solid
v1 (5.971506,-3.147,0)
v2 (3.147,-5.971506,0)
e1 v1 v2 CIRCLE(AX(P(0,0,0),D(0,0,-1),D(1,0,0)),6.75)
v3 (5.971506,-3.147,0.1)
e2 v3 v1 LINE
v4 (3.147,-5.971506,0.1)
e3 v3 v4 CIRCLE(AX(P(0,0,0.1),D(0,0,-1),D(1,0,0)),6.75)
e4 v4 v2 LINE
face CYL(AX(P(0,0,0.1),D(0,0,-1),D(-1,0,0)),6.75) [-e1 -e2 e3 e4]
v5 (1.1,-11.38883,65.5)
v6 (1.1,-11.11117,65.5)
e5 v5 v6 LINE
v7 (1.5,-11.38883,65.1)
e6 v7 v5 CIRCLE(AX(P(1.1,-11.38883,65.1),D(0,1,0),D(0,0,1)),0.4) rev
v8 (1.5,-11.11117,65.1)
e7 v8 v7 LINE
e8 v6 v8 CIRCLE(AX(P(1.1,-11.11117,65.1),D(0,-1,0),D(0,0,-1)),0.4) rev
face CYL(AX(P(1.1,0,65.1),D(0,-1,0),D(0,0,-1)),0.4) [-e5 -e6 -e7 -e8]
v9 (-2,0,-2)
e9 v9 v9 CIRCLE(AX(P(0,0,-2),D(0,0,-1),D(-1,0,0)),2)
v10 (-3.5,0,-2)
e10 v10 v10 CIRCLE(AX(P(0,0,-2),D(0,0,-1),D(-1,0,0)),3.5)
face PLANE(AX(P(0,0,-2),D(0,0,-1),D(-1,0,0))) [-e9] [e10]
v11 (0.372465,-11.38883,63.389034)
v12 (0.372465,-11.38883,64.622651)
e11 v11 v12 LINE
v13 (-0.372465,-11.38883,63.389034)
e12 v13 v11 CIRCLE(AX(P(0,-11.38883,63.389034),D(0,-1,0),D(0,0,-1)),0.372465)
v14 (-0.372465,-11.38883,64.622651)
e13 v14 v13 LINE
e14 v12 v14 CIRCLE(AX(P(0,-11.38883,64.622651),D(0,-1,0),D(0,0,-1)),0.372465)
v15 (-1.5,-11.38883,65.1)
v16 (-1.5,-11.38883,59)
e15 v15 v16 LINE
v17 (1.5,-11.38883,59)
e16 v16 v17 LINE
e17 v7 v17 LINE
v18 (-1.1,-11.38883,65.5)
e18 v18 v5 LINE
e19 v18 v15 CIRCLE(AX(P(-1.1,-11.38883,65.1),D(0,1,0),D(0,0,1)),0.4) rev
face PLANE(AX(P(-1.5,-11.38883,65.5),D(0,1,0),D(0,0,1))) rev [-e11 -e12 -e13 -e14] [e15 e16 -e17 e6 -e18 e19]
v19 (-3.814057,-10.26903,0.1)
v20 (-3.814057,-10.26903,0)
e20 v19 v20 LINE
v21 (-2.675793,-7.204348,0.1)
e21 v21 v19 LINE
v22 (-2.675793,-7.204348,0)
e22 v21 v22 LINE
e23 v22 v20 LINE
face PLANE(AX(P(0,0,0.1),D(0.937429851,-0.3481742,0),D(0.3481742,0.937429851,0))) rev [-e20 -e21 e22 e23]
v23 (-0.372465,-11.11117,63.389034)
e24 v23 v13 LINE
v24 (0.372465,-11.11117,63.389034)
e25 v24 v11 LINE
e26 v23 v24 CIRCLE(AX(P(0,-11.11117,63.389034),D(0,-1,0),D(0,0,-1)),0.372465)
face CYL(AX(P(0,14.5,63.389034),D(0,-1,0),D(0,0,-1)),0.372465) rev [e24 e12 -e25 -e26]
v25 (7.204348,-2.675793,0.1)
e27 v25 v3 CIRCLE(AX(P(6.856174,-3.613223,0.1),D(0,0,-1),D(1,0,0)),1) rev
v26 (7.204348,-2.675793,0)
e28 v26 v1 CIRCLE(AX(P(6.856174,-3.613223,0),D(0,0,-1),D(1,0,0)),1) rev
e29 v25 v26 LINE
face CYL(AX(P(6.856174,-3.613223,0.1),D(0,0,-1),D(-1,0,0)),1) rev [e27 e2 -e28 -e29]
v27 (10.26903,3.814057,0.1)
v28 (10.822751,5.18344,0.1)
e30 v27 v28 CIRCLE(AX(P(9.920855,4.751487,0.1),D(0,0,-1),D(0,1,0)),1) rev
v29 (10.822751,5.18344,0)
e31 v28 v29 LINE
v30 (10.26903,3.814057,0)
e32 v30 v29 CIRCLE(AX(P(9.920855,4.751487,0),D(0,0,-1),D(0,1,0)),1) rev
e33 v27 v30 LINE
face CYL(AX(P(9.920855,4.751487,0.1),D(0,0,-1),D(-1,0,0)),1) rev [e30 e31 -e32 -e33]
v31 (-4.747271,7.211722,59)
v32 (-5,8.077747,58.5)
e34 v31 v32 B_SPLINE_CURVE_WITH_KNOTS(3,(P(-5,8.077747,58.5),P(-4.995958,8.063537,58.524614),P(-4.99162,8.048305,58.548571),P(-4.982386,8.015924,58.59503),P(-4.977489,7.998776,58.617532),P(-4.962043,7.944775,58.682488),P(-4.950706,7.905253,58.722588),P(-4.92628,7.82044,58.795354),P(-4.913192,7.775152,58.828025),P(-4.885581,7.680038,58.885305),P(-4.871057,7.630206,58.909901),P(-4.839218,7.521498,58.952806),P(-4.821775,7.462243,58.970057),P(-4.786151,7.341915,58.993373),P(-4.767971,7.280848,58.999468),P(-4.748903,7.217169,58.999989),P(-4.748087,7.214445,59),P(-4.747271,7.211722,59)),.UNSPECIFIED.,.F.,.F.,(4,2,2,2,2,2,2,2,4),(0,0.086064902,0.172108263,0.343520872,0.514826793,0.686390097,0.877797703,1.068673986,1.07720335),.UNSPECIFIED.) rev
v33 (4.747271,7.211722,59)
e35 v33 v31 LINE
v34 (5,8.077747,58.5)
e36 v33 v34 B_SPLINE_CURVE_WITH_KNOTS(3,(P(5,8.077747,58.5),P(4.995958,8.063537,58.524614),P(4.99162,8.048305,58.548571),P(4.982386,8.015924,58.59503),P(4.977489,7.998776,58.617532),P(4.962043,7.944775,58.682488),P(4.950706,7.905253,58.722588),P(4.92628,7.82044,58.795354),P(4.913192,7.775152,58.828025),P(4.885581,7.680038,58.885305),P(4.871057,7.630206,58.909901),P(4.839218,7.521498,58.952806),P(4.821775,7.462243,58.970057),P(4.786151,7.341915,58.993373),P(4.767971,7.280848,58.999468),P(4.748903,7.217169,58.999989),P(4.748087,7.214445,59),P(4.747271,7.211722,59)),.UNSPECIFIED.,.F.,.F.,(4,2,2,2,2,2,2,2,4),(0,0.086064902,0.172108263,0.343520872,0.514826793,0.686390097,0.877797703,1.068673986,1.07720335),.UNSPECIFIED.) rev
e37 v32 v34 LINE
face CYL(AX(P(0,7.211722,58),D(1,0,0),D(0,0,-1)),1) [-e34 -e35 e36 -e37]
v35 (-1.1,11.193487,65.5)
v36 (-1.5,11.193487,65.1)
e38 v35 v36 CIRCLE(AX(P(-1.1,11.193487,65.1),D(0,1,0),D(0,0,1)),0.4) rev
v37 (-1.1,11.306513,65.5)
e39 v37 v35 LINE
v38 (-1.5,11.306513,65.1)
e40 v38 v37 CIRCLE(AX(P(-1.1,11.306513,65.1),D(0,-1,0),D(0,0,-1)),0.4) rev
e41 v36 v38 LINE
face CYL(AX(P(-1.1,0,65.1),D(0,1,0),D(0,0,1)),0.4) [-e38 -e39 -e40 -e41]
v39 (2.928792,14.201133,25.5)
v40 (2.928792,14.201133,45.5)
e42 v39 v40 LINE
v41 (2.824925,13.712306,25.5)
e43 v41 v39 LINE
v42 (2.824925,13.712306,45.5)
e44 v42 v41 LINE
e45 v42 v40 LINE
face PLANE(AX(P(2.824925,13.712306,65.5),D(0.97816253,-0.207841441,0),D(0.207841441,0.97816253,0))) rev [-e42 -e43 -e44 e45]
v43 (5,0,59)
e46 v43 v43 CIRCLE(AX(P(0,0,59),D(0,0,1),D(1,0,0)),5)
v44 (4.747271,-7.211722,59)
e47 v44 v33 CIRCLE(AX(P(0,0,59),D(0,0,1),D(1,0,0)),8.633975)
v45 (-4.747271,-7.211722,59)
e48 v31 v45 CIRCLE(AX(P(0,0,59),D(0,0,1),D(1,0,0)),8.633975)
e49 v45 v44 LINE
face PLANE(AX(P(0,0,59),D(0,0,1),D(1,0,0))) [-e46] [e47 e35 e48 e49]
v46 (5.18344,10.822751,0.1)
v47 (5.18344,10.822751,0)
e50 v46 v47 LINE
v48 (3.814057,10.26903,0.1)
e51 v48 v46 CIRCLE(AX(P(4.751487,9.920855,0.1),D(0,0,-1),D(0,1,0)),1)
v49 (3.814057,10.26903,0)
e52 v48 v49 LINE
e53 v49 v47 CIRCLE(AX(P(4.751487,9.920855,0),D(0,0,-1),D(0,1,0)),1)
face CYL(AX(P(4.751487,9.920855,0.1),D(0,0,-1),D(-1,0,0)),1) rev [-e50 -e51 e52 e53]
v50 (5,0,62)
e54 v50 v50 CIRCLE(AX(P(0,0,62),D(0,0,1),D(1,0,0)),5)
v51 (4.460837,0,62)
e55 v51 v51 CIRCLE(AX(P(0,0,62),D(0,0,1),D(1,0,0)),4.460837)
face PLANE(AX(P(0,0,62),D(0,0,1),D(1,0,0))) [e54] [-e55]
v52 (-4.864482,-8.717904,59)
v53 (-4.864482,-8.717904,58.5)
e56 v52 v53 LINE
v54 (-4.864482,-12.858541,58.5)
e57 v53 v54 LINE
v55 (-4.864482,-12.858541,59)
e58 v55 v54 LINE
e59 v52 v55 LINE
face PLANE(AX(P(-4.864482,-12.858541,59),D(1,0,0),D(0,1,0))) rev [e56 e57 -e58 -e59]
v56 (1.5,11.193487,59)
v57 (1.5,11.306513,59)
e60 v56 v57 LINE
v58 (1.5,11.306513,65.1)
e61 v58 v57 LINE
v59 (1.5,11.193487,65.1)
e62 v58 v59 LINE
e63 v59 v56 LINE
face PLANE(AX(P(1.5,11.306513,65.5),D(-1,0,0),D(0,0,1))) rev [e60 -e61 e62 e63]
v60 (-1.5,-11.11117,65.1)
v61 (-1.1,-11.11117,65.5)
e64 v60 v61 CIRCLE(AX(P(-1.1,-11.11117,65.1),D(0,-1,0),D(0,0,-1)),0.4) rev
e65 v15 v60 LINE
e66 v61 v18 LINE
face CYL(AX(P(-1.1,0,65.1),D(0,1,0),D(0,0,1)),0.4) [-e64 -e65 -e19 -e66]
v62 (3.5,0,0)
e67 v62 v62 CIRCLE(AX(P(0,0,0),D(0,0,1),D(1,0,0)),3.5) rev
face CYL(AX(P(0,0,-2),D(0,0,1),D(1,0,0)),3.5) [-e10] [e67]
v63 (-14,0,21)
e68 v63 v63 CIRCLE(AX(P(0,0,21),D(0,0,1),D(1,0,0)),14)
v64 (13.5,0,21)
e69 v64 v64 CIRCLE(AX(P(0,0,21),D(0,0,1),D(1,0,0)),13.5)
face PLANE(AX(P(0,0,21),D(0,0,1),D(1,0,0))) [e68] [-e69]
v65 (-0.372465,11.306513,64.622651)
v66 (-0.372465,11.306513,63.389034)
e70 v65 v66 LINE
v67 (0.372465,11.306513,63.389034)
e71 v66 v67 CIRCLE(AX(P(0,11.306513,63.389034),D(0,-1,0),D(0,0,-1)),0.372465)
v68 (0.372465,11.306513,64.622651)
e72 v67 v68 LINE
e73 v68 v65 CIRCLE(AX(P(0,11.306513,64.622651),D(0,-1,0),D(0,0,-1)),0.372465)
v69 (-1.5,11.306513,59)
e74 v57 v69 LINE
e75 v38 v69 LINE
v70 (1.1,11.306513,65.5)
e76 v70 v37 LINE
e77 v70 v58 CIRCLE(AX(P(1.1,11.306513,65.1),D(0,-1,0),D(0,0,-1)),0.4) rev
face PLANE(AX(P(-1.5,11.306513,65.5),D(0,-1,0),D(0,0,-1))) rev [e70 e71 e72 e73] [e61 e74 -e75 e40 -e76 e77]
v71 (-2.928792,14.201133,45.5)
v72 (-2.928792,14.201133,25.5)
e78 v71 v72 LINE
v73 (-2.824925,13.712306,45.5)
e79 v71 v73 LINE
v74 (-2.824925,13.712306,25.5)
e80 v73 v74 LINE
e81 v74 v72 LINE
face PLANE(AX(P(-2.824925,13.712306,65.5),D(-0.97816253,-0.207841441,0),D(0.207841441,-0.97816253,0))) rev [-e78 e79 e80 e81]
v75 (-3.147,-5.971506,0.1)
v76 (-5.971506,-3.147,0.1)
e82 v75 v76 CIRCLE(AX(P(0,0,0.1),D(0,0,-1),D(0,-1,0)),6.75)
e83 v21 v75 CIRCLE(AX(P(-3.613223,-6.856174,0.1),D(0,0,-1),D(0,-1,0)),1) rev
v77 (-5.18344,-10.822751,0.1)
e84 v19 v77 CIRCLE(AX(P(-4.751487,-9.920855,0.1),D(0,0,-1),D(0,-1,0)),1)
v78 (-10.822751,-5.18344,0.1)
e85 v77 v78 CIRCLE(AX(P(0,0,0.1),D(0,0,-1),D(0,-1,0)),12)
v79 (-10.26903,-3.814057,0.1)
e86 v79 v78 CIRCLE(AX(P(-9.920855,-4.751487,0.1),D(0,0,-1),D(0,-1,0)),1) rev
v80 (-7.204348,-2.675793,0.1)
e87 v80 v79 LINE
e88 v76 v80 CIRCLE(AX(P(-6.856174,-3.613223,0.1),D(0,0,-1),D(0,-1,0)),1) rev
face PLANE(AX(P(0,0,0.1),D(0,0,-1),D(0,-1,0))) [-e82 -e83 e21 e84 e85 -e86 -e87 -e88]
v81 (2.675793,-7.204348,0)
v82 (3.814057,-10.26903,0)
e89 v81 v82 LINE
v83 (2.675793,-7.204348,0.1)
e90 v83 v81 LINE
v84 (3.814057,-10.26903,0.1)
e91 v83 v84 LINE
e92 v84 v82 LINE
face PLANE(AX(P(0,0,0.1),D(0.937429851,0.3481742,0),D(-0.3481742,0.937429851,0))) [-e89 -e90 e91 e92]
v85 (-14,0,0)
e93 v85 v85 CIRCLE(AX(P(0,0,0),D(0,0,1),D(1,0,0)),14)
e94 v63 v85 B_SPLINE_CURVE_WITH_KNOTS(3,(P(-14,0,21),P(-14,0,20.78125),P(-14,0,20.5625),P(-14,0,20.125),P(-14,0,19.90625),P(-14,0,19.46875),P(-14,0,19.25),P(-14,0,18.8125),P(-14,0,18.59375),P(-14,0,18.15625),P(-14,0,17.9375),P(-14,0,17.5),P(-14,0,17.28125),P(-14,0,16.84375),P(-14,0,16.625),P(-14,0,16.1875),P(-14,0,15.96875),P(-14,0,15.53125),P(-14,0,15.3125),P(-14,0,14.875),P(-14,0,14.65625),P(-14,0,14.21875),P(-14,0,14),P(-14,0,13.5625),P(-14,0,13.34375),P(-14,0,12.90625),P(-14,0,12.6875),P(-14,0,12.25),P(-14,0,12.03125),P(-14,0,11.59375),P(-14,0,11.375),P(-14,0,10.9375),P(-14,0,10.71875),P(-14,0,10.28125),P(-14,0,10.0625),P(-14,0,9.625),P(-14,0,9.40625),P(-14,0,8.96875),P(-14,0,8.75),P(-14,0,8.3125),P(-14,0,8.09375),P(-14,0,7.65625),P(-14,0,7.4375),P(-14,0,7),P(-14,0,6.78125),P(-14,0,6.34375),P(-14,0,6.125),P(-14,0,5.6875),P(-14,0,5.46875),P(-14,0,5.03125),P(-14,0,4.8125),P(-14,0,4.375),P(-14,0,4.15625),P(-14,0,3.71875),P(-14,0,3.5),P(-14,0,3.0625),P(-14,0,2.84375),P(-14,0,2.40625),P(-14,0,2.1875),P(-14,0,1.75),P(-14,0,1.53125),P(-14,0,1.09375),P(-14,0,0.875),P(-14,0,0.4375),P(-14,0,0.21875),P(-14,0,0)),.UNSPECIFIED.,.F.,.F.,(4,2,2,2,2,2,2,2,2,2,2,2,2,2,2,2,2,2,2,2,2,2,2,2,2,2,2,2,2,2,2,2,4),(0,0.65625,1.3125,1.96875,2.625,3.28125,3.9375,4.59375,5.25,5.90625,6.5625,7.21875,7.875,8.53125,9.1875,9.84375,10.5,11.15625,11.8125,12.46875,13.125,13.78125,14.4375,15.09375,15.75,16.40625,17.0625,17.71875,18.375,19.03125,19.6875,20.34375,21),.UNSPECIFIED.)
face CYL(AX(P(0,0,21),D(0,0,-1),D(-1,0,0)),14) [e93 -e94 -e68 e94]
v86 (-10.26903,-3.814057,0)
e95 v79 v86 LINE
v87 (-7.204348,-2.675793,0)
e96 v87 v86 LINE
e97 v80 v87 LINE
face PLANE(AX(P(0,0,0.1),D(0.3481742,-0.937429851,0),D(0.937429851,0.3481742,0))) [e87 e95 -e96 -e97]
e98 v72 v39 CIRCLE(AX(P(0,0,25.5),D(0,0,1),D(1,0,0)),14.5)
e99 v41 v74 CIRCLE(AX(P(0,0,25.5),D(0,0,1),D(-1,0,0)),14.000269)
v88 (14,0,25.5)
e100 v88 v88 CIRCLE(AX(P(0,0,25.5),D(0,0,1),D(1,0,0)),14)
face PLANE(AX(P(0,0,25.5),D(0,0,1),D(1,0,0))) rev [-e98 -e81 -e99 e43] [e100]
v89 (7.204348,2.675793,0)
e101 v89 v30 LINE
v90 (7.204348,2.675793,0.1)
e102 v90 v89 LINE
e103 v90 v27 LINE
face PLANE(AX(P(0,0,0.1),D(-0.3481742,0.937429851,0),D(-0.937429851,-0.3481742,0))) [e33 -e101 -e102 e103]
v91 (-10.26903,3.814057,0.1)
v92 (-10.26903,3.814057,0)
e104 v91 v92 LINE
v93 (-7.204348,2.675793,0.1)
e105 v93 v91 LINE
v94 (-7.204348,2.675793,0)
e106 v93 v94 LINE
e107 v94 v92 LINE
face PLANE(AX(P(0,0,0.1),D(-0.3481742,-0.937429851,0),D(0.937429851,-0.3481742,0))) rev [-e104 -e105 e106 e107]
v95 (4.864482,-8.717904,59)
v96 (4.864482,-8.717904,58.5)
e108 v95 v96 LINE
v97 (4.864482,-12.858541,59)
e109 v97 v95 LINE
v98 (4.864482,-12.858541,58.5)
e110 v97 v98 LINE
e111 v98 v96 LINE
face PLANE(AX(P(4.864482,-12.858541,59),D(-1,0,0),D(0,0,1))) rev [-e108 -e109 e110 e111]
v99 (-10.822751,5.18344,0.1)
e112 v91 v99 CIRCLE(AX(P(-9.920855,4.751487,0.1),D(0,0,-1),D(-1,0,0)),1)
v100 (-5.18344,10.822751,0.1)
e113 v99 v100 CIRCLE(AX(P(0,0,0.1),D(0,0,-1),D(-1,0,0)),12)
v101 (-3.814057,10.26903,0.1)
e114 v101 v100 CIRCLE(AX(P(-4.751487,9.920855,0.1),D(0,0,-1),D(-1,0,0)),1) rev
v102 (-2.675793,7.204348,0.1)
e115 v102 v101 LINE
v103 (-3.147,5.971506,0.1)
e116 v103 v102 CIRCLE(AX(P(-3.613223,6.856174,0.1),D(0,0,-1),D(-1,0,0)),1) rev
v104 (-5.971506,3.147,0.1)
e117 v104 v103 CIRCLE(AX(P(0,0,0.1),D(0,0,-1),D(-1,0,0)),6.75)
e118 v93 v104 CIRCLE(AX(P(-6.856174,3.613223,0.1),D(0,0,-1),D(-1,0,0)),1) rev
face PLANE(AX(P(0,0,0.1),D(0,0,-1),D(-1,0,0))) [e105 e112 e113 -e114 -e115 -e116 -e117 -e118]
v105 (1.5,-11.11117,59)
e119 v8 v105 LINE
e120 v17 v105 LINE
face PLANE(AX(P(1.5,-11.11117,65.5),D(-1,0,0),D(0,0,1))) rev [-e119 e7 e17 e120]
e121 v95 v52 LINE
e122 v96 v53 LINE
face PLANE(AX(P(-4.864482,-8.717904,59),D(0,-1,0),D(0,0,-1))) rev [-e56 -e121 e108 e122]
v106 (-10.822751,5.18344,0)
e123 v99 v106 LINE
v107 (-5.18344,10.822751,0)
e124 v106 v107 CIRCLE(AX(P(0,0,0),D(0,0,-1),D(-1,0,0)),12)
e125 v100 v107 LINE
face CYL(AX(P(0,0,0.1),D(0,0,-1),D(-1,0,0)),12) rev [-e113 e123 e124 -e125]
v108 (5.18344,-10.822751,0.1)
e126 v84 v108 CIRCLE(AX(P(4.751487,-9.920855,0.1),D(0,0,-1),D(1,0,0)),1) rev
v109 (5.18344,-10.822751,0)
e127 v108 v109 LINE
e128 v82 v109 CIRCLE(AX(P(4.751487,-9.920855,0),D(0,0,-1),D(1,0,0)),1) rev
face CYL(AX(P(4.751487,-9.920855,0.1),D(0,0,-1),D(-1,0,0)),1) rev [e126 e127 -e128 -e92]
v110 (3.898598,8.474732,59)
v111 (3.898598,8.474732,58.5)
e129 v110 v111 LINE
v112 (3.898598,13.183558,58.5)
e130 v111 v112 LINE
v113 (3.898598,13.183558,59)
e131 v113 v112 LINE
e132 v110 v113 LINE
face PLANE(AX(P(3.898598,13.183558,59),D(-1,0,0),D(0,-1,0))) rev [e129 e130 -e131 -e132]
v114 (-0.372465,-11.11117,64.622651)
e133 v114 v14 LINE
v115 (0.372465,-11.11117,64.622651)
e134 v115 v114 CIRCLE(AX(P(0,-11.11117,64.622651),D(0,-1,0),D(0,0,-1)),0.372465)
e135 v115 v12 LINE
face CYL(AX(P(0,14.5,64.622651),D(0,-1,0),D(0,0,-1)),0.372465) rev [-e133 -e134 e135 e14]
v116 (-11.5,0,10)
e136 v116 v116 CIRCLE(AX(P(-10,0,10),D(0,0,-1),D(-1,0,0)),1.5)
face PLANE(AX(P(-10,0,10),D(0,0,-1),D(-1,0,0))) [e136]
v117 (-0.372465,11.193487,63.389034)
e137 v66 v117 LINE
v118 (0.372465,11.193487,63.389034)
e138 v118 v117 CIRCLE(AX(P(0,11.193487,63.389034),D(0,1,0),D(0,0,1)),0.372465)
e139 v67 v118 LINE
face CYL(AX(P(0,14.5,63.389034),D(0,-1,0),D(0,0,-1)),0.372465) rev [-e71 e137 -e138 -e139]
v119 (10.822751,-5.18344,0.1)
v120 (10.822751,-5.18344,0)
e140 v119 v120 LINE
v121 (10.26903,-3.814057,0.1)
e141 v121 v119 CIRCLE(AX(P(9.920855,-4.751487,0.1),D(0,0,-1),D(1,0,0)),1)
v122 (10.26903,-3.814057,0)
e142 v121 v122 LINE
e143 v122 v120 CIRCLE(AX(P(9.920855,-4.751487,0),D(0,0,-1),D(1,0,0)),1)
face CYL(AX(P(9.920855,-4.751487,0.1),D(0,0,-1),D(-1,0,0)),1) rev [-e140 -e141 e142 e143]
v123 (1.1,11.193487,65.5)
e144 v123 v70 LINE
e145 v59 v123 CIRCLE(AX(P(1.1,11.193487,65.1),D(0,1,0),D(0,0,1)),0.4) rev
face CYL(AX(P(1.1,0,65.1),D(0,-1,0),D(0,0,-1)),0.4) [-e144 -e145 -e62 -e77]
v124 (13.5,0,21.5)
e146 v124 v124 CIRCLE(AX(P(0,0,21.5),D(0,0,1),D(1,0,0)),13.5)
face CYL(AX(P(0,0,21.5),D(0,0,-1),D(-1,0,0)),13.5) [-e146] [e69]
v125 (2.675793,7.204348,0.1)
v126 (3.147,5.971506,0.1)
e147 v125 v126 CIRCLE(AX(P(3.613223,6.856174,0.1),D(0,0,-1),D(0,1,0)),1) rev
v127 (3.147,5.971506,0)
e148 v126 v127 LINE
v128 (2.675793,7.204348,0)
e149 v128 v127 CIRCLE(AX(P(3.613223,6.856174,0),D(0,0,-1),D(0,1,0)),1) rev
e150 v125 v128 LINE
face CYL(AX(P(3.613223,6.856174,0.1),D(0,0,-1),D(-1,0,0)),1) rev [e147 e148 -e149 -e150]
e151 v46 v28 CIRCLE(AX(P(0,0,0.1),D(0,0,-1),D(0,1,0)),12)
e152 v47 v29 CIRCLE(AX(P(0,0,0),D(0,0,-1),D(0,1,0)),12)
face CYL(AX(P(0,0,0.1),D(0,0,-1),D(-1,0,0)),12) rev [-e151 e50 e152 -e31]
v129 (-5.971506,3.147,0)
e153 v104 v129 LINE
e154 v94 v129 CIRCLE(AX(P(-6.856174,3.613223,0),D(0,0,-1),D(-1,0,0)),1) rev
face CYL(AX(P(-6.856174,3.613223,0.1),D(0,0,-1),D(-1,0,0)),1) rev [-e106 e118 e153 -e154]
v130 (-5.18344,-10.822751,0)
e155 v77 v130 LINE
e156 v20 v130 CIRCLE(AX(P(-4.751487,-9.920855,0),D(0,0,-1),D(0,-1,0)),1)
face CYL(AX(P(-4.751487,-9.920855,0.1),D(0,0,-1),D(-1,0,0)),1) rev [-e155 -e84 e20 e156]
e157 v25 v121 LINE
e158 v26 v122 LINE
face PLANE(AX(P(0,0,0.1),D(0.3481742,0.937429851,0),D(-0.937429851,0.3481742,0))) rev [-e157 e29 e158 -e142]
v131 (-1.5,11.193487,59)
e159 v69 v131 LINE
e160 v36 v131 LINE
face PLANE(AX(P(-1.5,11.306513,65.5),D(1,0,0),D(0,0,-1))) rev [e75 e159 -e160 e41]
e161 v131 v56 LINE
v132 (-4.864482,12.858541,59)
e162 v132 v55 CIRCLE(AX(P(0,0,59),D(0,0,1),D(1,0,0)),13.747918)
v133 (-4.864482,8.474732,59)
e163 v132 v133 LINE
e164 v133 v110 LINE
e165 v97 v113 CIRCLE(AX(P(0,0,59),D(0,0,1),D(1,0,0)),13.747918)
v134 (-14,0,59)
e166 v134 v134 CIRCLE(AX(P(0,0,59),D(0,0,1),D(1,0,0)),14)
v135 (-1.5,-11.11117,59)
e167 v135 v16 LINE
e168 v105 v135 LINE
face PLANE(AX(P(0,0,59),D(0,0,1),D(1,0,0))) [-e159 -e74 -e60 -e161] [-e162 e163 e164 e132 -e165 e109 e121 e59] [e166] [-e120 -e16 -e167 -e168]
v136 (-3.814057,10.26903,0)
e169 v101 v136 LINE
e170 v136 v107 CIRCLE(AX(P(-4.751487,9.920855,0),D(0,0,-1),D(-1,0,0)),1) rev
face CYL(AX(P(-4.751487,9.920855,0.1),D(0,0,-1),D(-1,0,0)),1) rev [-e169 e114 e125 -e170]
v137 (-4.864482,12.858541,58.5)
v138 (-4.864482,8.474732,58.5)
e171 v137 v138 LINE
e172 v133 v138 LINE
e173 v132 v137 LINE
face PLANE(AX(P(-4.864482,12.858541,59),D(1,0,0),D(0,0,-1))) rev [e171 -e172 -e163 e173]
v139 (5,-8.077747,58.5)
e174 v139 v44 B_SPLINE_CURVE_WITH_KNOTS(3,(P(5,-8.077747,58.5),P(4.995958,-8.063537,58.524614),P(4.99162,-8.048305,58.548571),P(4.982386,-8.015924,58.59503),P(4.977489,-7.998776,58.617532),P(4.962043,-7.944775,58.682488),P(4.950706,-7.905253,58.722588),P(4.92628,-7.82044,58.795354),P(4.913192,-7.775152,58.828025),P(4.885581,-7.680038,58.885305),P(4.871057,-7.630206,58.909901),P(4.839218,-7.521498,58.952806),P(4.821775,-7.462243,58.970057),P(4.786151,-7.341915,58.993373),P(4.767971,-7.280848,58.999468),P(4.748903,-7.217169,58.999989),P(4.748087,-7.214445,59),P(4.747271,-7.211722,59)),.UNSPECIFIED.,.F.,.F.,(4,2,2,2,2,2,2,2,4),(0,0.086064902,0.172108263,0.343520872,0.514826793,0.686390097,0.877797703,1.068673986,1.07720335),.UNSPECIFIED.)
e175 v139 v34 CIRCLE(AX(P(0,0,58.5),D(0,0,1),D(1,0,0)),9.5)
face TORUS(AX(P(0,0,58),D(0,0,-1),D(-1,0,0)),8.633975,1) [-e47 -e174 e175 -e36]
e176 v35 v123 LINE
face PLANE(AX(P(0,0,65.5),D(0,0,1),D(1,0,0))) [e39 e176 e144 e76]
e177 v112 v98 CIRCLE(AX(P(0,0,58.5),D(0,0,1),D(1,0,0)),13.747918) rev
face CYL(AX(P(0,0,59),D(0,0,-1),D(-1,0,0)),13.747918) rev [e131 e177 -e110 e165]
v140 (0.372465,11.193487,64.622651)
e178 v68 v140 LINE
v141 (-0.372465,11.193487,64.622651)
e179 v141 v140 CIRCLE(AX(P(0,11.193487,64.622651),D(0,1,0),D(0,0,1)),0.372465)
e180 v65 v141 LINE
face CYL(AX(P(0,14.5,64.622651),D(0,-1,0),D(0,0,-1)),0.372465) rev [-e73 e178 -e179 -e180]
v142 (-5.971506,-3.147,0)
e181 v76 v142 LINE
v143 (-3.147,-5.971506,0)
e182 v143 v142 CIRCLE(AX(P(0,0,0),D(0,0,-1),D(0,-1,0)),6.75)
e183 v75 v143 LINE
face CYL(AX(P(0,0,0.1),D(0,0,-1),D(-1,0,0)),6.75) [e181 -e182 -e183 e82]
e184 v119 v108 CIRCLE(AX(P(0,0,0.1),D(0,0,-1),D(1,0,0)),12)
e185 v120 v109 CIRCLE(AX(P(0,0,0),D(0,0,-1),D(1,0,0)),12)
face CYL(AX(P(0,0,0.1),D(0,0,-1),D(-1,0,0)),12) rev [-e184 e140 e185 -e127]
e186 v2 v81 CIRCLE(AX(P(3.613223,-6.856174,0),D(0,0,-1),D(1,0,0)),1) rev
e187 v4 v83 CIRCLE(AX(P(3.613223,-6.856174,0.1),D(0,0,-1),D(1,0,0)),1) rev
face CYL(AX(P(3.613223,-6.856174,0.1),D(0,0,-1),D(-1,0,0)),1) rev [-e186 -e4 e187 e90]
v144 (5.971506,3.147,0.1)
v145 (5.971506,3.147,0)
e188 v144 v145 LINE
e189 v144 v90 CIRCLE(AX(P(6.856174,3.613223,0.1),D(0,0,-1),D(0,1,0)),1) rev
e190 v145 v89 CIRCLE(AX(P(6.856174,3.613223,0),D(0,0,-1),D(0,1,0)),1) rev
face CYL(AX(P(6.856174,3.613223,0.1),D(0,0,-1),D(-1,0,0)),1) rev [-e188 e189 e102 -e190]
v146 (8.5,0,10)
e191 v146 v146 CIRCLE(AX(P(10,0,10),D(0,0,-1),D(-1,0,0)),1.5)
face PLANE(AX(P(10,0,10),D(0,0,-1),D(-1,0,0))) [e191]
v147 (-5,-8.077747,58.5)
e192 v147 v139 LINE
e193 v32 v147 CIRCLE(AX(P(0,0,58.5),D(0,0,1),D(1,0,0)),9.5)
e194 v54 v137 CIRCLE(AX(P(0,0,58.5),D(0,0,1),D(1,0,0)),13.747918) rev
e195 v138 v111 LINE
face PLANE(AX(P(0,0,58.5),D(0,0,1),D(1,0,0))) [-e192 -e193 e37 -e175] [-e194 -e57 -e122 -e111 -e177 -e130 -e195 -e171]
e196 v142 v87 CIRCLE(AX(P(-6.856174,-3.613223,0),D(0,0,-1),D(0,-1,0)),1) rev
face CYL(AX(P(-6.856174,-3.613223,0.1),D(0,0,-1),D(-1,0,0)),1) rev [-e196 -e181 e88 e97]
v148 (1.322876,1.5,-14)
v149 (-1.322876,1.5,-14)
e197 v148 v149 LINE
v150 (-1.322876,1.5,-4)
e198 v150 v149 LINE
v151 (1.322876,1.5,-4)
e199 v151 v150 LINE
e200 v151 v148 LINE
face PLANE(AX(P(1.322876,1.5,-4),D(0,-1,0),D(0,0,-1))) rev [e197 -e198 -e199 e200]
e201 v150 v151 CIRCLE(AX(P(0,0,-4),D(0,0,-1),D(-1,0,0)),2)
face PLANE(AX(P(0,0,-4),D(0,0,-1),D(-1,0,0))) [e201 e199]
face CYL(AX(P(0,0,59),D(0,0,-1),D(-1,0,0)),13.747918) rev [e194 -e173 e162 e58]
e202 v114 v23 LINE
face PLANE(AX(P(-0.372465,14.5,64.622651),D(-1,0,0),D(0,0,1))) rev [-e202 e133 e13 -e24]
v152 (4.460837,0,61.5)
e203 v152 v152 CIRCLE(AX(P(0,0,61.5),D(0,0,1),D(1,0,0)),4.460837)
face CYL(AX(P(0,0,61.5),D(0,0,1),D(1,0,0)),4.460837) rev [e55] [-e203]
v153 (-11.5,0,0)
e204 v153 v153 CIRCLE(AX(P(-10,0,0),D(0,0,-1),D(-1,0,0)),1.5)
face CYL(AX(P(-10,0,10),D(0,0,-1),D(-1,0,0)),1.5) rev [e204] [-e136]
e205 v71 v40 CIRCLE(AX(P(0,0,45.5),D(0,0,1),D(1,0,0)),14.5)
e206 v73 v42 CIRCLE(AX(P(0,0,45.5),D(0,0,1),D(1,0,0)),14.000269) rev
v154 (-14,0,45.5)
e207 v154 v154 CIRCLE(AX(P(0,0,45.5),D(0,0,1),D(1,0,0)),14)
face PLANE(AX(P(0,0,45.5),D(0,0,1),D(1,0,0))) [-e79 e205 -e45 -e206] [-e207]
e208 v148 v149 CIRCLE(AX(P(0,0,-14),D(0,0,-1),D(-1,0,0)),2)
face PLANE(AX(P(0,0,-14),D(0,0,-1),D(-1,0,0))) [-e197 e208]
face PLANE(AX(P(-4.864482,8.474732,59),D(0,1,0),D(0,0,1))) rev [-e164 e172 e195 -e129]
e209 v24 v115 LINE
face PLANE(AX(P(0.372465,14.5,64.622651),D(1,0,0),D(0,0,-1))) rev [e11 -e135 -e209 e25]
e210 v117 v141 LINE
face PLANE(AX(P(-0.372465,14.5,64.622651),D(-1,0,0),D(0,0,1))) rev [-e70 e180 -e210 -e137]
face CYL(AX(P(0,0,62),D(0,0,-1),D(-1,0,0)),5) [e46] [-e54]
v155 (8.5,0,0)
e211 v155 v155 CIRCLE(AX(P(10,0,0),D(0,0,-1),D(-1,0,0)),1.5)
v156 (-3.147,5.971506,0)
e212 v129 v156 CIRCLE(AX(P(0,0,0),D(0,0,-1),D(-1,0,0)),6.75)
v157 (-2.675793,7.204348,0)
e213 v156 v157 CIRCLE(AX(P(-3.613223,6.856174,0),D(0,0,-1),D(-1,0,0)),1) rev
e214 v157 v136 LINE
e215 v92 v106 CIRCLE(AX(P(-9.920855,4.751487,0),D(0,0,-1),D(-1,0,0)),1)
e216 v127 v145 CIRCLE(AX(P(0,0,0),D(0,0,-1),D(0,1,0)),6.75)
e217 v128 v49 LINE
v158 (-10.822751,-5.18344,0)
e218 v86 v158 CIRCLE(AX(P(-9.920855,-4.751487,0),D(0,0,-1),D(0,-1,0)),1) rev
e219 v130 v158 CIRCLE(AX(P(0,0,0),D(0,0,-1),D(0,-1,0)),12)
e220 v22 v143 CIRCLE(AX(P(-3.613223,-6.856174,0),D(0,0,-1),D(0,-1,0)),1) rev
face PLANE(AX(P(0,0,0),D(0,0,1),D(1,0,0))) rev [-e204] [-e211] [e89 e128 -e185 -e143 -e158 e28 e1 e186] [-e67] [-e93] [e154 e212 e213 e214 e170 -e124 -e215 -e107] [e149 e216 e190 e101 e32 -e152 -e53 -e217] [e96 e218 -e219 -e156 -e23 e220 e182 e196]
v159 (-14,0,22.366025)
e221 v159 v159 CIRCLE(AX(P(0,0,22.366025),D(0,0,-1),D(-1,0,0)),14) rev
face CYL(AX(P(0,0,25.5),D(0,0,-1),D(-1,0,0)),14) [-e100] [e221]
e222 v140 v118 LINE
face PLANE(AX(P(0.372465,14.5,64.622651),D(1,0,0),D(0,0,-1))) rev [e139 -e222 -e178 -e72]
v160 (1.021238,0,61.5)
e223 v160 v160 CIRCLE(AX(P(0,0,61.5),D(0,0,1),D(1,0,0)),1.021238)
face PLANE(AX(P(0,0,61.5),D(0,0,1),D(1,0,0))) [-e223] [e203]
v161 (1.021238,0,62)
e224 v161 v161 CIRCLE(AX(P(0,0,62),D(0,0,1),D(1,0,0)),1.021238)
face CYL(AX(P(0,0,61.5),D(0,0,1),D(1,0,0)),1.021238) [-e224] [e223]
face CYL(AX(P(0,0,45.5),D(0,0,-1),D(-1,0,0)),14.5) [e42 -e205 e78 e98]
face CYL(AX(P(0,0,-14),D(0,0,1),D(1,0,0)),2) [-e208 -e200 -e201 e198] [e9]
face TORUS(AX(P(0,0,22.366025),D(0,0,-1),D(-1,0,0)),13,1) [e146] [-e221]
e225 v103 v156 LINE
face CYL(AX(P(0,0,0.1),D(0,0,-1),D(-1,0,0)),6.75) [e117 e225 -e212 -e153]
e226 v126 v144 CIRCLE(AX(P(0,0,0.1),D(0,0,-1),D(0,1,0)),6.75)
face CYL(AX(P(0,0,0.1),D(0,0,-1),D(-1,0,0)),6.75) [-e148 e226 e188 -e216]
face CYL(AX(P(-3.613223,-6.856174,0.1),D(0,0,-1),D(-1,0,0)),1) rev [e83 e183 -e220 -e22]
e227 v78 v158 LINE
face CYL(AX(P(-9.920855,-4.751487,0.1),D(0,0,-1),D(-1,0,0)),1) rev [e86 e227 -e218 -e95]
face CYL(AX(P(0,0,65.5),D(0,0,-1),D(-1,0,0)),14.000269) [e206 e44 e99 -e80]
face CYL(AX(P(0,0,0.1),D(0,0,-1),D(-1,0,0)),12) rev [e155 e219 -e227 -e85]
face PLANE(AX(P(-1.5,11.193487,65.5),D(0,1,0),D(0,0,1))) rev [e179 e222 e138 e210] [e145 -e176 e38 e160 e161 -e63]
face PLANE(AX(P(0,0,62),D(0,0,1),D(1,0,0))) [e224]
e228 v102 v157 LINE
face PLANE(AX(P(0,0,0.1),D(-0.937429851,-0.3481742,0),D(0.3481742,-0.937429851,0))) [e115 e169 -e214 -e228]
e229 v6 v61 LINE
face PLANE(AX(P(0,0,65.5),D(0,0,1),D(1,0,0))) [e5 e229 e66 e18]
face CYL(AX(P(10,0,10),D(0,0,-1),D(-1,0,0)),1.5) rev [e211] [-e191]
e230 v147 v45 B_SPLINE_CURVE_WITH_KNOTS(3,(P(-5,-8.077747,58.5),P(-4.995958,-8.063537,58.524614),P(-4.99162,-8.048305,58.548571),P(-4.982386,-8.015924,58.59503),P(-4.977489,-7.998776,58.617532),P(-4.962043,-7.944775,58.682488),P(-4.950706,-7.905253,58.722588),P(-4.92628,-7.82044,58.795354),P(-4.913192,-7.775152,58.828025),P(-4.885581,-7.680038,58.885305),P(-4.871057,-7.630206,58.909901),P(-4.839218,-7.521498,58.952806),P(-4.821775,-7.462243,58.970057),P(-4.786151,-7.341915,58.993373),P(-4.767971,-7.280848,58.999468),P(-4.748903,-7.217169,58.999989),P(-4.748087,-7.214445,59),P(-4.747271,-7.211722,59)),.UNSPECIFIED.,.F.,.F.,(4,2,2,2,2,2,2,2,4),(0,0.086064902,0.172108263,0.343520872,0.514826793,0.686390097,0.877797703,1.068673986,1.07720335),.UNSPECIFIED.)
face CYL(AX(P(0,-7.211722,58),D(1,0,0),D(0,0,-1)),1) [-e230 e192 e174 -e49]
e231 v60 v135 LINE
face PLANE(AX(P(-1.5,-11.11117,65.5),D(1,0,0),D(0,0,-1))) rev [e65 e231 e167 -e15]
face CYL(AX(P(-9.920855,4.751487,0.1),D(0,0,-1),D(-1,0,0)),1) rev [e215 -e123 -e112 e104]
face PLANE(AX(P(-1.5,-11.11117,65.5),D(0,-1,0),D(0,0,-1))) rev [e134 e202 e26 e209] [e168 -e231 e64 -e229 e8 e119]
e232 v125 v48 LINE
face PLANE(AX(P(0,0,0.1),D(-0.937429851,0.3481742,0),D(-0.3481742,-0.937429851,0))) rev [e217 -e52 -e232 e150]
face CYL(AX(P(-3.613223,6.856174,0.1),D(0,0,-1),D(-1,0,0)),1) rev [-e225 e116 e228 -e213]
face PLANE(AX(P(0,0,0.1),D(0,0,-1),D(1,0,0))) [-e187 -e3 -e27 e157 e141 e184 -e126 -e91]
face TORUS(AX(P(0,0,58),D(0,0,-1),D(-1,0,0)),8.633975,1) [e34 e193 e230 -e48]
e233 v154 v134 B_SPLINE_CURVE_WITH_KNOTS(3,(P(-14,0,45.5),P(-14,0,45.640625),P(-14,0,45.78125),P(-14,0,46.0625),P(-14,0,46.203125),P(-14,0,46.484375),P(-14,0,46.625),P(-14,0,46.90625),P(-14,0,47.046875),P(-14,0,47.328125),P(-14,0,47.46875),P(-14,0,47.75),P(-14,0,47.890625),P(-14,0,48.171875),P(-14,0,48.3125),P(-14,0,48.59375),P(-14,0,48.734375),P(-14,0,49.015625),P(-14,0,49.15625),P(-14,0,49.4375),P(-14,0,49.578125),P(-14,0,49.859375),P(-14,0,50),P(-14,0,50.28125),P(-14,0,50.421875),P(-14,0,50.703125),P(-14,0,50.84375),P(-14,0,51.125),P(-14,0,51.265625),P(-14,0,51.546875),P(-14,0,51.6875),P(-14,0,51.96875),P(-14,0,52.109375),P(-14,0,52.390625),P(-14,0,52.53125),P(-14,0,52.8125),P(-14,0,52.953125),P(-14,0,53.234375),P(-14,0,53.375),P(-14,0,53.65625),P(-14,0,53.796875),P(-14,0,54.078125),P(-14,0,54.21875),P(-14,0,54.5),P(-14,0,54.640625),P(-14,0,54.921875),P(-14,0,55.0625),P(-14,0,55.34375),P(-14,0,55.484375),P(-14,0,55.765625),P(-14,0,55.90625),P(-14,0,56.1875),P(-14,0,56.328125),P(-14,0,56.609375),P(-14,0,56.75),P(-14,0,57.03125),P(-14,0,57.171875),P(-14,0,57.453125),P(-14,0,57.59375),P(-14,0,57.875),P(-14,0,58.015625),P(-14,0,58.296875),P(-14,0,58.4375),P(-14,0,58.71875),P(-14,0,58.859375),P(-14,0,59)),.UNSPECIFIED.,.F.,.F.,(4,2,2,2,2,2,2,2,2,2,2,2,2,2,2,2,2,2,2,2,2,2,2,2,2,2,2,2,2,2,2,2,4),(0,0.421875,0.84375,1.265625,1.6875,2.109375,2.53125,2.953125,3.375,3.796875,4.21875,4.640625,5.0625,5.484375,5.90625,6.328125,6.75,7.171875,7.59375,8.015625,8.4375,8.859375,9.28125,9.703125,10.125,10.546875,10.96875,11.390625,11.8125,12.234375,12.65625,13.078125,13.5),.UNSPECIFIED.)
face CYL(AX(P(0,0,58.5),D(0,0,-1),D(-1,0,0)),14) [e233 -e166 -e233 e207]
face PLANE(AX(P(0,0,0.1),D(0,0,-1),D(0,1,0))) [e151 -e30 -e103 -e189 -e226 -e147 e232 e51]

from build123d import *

# Parameters (mm, degrees)
SKETCH1_R            = 14
BOSS_EXTRUDE1_DEPTH  = 21
SKETCH2_R            = 13.5
BOSS_EXTRUDE2_DEPTH  = 0.5
SKETCH3_R            = 14
BOSS_EXTRUDE3_DEPTH  = 4
SKETCH4_R            = 14.5
BOSS_EXTRUDE4_DEPTH  = 20
SKETCH5_R            = 14
BOSS_EXTRUDE5_DEPTH  = 13
FILLET1_R            = 1
SKETCH6_R            = 14
SKETCH6_R_2          = 13.74791831
BOSS_EXTRUDE6_DEPTH  = 0.5
FILLET2_R            = 1
SKETCH7_R            = 5
BOSS_EXTRUDE7_DEPTH  = 3
SKETCH8_R            = 4.460837006
SKETCH8_R_2          = 1.021238478
CUT_EXTRUDE1_DEPTH   = 0.5
BOSS_EXTRUDE8_DEPTH  = 0.5
SKETCH10_W           = 3
SKETCH10_H           = 0.113026654
SKETCH10_H_2         = 0.277660136
BOSS_EXTRUDE9_DEPTH  = 6.5
FILLET3_R            = 0.4
CUT_EXTRUDE2_DEPTH   = 72.907798758
CUT_EXTRUDE3_DEPTH   = 0.1
CIRPATTERN1_COUNT    = 4
CUT_EXTRUDE4_DEPTH   = 45.949972191
SKETCH15_R           = 3.5
BOSS_EXTRUDE10_DEPTH = 2
SKETCH16_R           = 2
BOSS_EXTRUDE11_DEPTH = 12
CUT_EXTRUDE7_START   = -10
CUT_EXTRUDE7_DEPTH   = 10
SKETCH18_R           = 1.5
CUT_EXTRUDE8_DEPTH   = 10


with BuildPart() as part:
    # Sketch1 → Boss-Extrude1 (new body)
    with BuildSketch(Plane.XY):
        with Locations(Location((0, 0, 0), (0, 0, 180))):
            Circle(SKETCH1_R)
    extrude(amount=BOSS_EXTRUDE1_DEPTH)

    # Sketch2 → Boss-Extrude2 (add)
    with BuildSketch(Plane.XY.offset(21)):
        Circle(SKETCH2_R)
    extrude(amount=BOSS_EXTRUDE2_DEPTH)

    # Sketch3 → Boss-Extrude3 (add)
    with BuildSketch(Plane.XY.offset(21.5)):
        with Locations(Location((0, 0, 0), (0, 0, 180))):
            Circle(SKETCH3_R)
    extrude(amount=BOSS_EXTRUDE3_DEPTH)

    # Sketch4 → Boss-Extrude4 (add)
    with BuildSketch(Plane.XY.offset(25.5)):
        Circle(SKETCH4_R)
    extrude(amount=BOSS_EXTRUDE4_DEPTH)

    # Sketch5 → Boss-Extrude5 (add)
    with BuildSketch(Plane.XY.offset(45.5)):
        with Locations(Location((0, 0, 0), (0, 0, 180))):
            Circle(SKETCH5_R)
    extrude(amount=BOSS_EXTRUDE5_DEPTH)

    # Fillet1
    # the kernel refuses this fillet: 1 mm, written as the material it takes off along each edge
    with BuildSketch(Plane(origin=(0, 0, 21.5), x_dir=(-1, 0, 0), z_dir=(0, 1, 0))) as fillet1_piece_1:
        with BuildLine():
            CenterArc((13, 0.866025404), FILLET1_R, 300, 60)
            Line((13.5, 0), (13.51, -0.017320508))
            ThreePointArc((13.51, -0.017320508), (13.75, -0.02), (14, -0.02))
            Line((14, -0.02), (14.02, 0))
            Line((14.02, 0), (14.02, 0.866025404))
            Line((14.02, 0.866025404), (14, 0.866025404))
        make_face()
    revolve(axis=Axis((0, 0, 21.5), (0, 0, 1)), mode=Mode.SUBTRACT)

    # Sketch6 → Boss-Extrude6 (add)
    # profile 1 of 2: a face of its own
    with BuildSketch(Plane.XY.offset(58.5)):
        with Locations(Location((0, 0, 0), (0, 0, 180))):
            Circle(SKETCH6_R)
        Circle(SKETCH6_R_2, mode=Mode.SUBTRACT)
    # profile 2 of 2: a face of its own
    with BuildSketch(Plane.XY.offset(58.5)):
        with BuildLine():
            Line((-5, -8.077747211), (5, -8.077747211))
            ThreePointArc((5, -8.077747211), (9.5, 0), (5, 8.077747211))
            Line((5, 8.077747211), (-5, 8.077747211))
            ThreePointArc((-5, 8.077747211), (-9.5, 0), (-5, -8.077747211))
        make_face()
    extrude(amount=BOSS_EXTRUDE6_DEPTH)

    # Fillet2
    # the kernel refuses this fillet: 1 mm, written as the material it takes off along each edge
    with BuildSketch(Plane(origin=(0, 0, 59), x_dir=(-0.3204523861035329, 0.9472646241893299, 0), z_dir=(0.9472646241893299, 0.3204523861035329, 0))) as fillet2_piece_1:
        with BuildLine():
            CenterArc((8.633974596, -1), FILLET2_R, 30, 60)
            Line((9.5, -0.5), (9.517320508, -0.49))
            ThreePointArc((9.517320508, -0.49), (9.52, -0.25), (9.52, 0))
            Line((9.52, 0), (9.5, 0.02))
            Line((9.5, 0.02), (8.633974596, 0.02))
            Line((8.633974596, 0.02), (8.633974596, 0))
        make_face()
    revolve(axis=Axis((0, 0, 59), (0, 0, 1)), revolution_arc=142.619429044, mode=Mode.SUBTRACT)
    with BuildSketch(Plane(origin=(7.165063509, 8.077747211, 59), x_dir=(0, -1, 0), z_dir=(-1, 0, 0)), Plane(origin=(-7.165063509, -8.077747211, 59), x_dir=(0, 1, 0), z_dir=(1, 0, 0))) as fillet2_piece_2:
        with BuildLine():
            CenterArc((0.866025404, -1), FILLET2_R, 90, 60)
            Line((0, -0.5), (-0.017320508, -0.49))
            ThreePointArc((-0.017320508, -0.49), (-0.02, -0.25), (-0.02, 0))
            Line((-0.02, 0), (0, 0.02))
            Line((0, 0.02), (0.866025404, 0.02))
            Line((0.866025404, 0.02), (0.866025404, 0))
        make_face()
    extrude(amount=14.330127019, mode=Mode.SUBTRACT)
    with BuildSketch(Plane(origin=(0, 0, 59), x_dir=(0.3204523861035327, -0.9472646241893299, 0), z_dir=(-0.9472646241893299, -0.3204523861035327, 0))) as fillet2_piece_3:
        with BuildLine():
            CenterArc((8.633974596, -1), FILLET2_R, 30, 60)
            Line((8.633974596, 0), (8.633974596, 0.02))
            Line((8.633974596, 0.02), (9.5, 0.02))
            Line((9.5, 0.02), (9.52, 0))
            ThreePointArc((9.52, 0), (9.52, -0.25), (9.517320508, -0.49))
            Line((9.517320508, -0.49), (9.5, -0.5))
        make_face()
    revolve(axis=Axis((0, 0, 59), (0, 0, 1)), revolution_arc=142.619429044, mode=Mode.SUBTRACT)

    # Sketch7 → Boss-Extrude7 (add)
    with BuildSketch(Plane.XY.offset(59)):
        Circle(SKETCH7_R)
    extrude(amount=BOSS_EXTRUDE7_DEPTH)

    # Sketch8 → Cut-Extrude1 (cut)
    with BuildSketch(Plane.XY.offset(62)):
        Circle(SKETCH8_R)
        Circle(SKETCH8_R_2, mode=Mode.SUBTRACT)
    extrude(amount=-CUT_EXTRUDE1_DEPTH, mode=Mode.SUBTRACT)

    # Sketch9 → Boss-Extrude8 (add)
    with BuildSketch(Plane.XY.offset(58.5)):
        with BuildLine():
            Line((-4.864481732, 12.858540949), (-4.864481732, 8.474731605))
            Line((-4.864481732, 8.474731605), (3.898597634, 8.474731605))
            Line((3.898597634, 8.474731605), (3.898597634, 13.183557727))
            ThreePointArc((3.898597634, 13.183557727), (-0.509550782, 13.738472108), (-4.864481732, 12.858540949))
        make_face()
        with BuildLine():
            Line((-4.864481732, -12.858540949), (-4.864481732, -8.717904414))
            Line((-4.864481732, -8.717904414), (4.864481732, -8.717904414))
            Line((4.864481732, -8.717904414), (4.864481732, -12.858540949))
            ThreePointArc((4.864481732, -12.858540949), (0, -13.74791831), (-4.864481732, -12.858540949))
        make_face()
    extrude(amount=BOSS_EXTRUDE8_DEPTH)

    # Sketch10 → Boss-Extrude9 (add)
    with BuildSketch(Plane.XY.offset(59)):
        with Locations((0, 11.25)):
            Rectangle(SKETCH10_W, SKETCH10_H)
        with Locations((0, -11.25)):
            Rectangle(SKETCH10_W, SKETCH10_H_2)
    extrude(amount=BOSS_EXTRUDE9_DEPTH)

    # Fillet3
    fillet3_edges = [part.edges().sort_by_distance(p)[0] for p in [
        (1.5, 11.25, 65.5),
        (-1.5, 11.25, 65.5),
        (1.5, -11.25, 65.5),
        (-1.5, -11.25, 65.5),
    ]]
    fillet(fillet3_edges, radius=FILLET3_R)

    # Sketch11 → Cut-Extrude2 (cut, through all)
    with BuildSketch(Plane.XZ.offset(11.388830068)):
        with BuildLine():
            Line((0.372464769, 64.6226508), (0.372464769, 63.389034489))
            ThreePointArc((0.372464769, 63.389034489), (0, 63.016569721), (-0.372464769, 63.389034489))
            Line((-0.372464769, 63.389034489), (-0.372464769, 64.6226508))
            ThreePointArc((-0.372464769, 64.6226508), (0, 64.995115568), (0.372464769, 64.6226508))
        make_face()
    extrude(amount=-CUT_EXTRUDE2_DEPTH, mode=Mode.SUBTRACT)

    # Sketch12 → Cut-Extrude3 (cut)
    with BuildSketch(Plane(origin=(0, 0, 0), x_dir=(-1, 0, 0), z_dir=(0, 0, -1))):
        with BuildLine():
            Line((2.675792917, 7.20434815), (3.81405727, 10.269029513))
            ThreePointArc((3.81405727, 10.269029513), (4.376615733, 10.847932139), (5.183440496, 10.82275125))
            ThreePointArc((5.183440496, 10.82275125), (8.485281374, 8.485281374), (10.82275125, 5.183440496))
            ThreePointArc((10.82275125, 5.183440496), (10.847932139, 4.376615733), (10.269029513, 3.81405727))
            Line((10.269029513, 3.81405727), (7.20434815, 2.675792917))
            ThreePointArc((7.20434815, 2.675792917), (6.499150933, 2.679127181), (5.971506343, 3.147000475))
            ThreePointArc((5.971506343, 3.147000475), (4.772970773, 4.772970773), (3.147000475, 5.971506343))
            ThreePointArc((3.147000475, 5.971506343), (2.679127181, 6.499150933), (2.675792917, 7.20434815))
        make_face()
    cut_extrude3 = extrude(amount=-CUT_EXTRUDE3_DEPTH, mode=Mode.SUBTRACT)

    # CirPattern1: Cut-Extrude3 ×4 about axis
    cirpattern1_axis = Axis((0, 0, 0), (0, 0, 1))
    for i in range(1, CIRPATTERN1_COUNT):
        add(cut_extrude3.rotate(cirpattern1_axis, i * 360 / CIRPATTERN1_COUNT), mode=Mode.SUBTRACT)

    # Sketch13 → Cut-Extrude4 (cut, through all)
    with BuildSketch(Plane(origin=(0, 0, 25.5), x_dir=(-1, 0, 0), z_dir=(0, 0, -1))):
        with BuildLine():
            Line((-2.824925092, 13.712305557), (-3, 14.536259215))
            ThreePointArc((-3, 14.536259215), (0, 14.842601927), (3, 14.536259215))
            Line((3, 14.536259215), (2.824925092, 13.712305557))
            ThreePointArc((2.824925092, 13.712305557), (0, 14.000268764), (-2.824925092, 13.712305557))
        make_face()
    extrude(amount=-CUT_EXTRUDE4_DEPTH, mode=Mode.SUBTRACT)

    # Sketch15 → Boss-Extrude10 (add)
    with BuildSketch(Plane(origin=(0, 0, 0), x_dir=(-1, 0, 0), z_dir=(0, 0, -1))):
        with Locations(Location((0, 0, 0), (0, 0, 180))):
            Circle(SKETCH15_R)
    extrude(amount=BOSS_EXTRUDE10_DEPTH)

    # Sketch16 → Boss-Extrude11 (add)
    with BuildSketch(Plane(origin=(0, 0, -2), x_dir=(-1, 0, 0), z_dir=(0, 0, -1))):
        Circle(SKETCH16_R)
    extrude(amount=BOSS_EXTRUDE11_DEPTH)

    # Sketch17 → Cut-Extrude7 (cut)
    with BuildSketch(Plane(origin=(0, 0, -14), x_dir=(-1, 0, 0), z_dir=(0, 0, -1)).offset(CUT_EXTRUDE7_START)):
        with BuildLine():
            Line((-1.322875656, 1.5), (1.322875656, 1.5))
            ThreePointArc((1.322875656, 1.5), (0, 2), (-1.322875656, 1.5))
        make_face()
    extrude(amount=CUT_EXTRUDE7_DEPTH, mode=Mode.SUBTRACT)

    # Sketch18 → Cut-Extrude8 (cut)
    with BuildSketch(Plane(origin=(0, 0, 0), x_dir=(-1, 0, 0), z_dir=(0, 0, -1))):
        with Locations((-10, 0)):
            Circle(SKETCH18_R)
        with Locations((10, 0)):
            Circle(SKETCH18_R)
    extrude(amount=-CUT_EXTRUDE8_DEPTH, mode=Mode.SUBTRACT)


solid = part.part
